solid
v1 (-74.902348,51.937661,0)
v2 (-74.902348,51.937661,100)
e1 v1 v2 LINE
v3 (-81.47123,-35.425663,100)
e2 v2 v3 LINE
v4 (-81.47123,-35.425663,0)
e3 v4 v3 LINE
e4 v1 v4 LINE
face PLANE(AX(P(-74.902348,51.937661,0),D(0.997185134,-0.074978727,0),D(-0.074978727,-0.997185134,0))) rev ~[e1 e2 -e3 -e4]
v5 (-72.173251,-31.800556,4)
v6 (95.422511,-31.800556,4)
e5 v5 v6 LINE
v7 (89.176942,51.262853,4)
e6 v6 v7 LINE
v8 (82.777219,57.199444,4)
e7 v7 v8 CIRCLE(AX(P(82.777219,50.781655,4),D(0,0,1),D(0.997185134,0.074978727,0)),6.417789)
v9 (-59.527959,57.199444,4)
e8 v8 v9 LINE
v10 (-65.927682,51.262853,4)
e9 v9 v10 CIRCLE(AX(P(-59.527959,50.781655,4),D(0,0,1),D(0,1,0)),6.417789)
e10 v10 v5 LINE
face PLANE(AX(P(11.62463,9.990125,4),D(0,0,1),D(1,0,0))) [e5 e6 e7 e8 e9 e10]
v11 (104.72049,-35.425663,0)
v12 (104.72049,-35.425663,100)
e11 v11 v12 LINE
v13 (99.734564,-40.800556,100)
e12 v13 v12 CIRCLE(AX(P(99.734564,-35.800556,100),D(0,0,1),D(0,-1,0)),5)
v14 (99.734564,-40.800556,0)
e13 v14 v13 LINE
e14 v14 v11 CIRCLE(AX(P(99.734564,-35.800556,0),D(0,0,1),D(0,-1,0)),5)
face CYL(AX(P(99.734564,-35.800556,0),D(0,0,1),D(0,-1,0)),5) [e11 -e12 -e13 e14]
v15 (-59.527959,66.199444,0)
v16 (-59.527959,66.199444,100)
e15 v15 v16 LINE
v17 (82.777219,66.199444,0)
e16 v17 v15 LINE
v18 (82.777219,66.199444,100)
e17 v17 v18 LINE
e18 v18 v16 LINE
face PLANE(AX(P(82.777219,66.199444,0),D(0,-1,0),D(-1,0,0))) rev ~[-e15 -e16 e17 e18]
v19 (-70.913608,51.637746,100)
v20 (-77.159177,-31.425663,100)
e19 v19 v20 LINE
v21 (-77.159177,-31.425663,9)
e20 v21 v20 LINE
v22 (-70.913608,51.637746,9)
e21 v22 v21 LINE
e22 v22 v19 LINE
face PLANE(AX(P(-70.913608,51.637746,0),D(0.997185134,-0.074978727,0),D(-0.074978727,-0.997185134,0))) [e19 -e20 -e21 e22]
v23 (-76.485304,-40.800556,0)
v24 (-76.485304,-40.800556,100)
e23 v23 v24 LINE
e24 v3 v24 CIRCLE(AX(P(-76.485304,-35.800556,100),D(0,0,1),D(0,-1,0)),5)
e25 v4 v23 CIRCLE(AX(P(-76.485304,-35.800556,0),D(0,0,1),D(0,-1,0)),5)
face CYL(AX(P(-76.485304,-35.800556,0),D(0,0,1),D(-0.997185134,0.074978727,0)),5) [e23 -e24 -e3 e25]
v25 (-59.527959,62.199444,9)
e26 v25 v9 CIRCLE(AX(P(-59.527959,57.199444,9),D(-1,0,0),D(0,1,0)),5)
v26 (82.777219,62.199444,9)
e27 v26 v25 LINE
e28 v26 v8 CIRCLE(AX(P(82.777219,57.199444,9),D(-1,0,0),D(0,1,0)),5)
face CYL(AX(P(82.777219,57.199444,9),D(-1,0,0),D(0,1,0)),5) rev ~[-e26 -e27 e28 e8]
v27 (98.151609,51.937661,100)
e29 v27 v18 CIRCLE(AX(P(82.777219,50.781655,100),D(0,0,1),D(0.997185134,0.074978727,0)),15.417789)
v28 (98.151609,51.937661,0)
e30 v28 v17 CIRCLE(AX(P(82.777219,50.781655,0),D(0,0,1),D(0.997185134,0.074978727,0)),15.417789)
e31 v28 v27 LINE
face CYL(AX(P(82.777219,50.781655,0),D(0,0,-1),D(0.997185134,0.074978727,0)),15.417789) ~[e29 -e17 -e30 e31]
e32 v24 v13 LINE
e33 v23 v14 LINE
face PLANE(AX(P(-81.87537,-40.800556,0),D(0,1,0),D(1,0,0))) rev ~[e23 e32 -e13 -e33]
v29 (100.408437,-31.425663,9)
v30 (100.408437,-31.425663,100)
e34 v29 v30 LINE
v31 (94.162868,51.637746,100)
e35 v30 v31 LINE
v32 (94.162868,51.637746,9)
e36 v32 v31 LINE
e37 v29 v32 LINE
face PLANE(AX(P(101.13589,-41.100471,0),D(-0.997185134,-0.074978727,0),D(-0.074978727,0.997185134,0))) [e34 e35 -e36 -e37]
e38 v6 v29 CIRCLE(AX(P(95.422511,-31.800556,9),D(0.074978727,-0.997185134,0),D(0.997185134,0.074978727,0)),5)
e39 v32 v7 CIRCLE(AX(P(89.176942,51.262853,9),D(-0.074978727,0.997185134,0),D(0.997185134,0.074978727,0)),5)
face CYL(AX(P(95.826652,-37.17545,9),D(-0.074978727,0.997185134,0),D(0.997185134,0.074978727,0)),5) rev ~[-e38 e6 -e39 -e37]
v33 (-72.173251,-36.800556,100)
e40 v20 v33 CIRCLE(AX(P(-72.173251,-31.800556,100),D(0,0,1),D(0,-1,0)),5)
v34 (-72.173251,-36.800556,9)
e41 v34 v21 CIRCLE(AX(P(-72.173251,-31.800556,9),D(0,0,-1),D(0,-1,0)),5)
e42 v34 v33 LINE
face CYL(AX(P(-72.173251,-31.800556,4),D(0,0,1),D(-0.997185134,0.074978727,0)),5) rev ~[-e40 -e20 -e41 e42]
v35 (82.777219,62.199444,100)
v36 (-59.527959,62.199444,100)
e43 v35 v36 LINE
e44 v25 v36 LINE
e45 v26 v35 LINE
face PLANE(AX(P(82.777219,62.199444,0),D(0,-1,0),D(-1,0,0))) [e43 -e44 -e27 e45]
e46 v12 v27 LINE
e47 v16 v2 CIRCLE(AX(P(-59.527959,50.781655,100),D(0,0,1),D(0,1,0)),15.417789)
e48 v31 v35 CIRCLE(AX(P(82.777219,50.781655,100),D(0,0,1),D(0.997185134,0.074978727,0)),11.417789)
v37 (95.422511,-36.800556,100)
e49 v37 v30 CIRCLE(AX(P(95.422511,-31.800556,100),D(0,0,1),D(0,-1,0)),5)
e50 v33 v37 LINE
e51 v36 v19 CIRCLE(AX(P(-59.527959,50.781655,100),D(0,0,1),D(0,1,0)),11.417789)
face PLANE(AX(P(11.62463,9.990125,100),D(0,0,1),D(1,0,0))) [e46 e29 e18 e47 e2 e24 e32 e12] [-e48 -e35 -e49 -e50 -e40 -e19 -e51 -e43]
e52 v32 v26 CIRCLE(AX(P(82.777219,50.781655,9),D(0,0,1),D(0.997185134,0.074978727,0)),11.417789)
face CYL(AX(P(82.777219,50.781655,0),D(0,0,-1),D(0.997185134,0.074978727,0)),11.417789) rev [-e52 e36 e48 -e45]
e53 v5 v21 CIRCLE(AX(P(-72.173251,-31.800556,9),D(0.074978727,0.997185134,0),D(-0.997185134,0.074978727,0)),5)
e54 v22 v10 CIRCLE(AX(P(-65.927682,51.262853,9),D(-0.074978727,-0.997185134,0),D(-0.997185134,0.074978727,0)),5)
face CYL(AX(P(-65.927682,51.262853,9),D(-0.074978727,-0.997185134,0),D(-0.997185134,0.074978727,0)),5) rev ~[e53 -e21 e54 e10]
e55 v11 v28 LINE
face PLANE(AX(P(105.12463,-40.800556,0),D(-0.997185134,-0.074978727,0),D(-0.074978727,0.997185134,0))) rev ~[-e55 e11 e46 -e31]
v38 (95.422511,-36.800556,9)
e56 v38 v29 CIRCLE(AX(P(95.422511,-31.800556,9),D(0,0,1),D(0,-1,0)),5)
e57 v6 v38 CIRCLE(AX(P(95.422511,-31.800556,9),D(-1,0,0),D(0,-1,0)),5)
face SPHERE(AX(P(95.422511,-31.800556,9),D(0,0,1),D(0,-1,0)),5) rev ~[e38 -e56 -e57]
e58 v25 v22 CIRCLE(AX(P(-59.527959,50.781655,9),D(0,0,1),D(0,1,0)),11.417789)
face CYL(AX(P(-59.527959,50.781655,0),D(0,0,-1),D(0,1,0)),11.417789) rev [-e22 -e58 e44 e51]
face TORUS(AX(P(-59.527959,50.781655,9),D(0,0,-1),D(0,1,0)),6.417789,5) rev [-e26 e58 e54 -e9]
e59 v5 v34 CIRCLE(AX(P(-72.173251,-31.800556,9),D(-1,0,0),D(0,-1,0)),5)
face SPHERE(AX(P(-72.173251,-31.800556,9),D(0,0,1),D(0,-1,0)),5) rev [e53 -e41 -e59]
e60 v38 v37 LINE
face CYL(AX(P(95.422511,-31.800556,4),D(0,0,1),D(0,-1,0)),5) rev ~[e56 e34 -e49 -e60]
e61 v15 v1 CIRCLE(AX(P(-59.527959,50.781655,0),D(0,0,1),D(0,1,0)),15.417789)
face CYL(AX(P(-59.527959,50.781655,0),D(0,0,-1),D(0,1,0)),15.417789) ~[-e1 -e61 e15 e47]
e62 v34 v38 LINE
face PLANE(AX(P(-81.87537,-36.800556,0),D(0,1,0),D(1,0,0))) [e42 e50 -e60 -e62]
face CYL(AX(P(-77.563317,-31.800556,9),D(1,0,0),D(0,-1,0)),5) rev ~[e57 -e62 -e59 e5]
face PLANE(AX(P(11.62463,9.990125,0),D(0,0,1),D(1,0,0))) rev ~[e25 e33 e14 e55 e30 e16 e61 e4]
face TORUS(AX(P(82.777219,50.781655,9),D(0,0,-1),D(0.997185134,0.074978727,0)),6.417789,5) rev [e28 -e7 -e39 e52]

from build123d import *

# Parameters (mm, degrees)
F1_DEPTH = 100
F2_T     = -4
F3_R     = 5


with BuildPart() as f1:
    # F0 (on Top) → F1 (new body)
    with BuildSketch(Plane.XY):
        with BuildLine():
            Line((-74.9023482991, 51.9376612258), (-81.8753698939, -40.8005561921))
            Line((-81.8753698939, -40.8005561921), (105.1246301061, -40.8005561921))
            Line((105.1246301061, -40.8005561921), (98.1516085112, 51.9376612258))
            ThreePointArc((98.1516085112, 51.9376612258), (93.2625692956, 62.0850012182), (82.7772187745, 66.1994438079))
            Line((82.7772187745, 66.1994438079), (-59.5279585624, 66.1994438079))
            ThreePointArc((-59.5279585624, 66.1994438079), (-70.0133090834, 62.0850012182), (-74.9023482991, 51.9376612258))
        make_face()
    extrude(amount=F1_DEPTH)

    # F2
    f2_openings = [f1.faces().sort_by_distance(p)[0] for p in [
        (11.62463, 11.668388, 100),
    ]]
    offset(amount=F2_T, openings=f2_openings)

    # F3
    f3_edges = [f1.edges().sort_by_distance(p)[0] for p in [
        (105.12463, -40.800556, 50),
        (-81.87537, -40.800556, 50),
        (100.812577, -36.800556, 52),
        (-77.563317, -36.800556, 52),
        (11.62463, -36.800556, 4),
        (97.487723, 7.418595, 4),
    ]]
    fillet(f3_edges, radius=F3_R)


solid = f1.part
